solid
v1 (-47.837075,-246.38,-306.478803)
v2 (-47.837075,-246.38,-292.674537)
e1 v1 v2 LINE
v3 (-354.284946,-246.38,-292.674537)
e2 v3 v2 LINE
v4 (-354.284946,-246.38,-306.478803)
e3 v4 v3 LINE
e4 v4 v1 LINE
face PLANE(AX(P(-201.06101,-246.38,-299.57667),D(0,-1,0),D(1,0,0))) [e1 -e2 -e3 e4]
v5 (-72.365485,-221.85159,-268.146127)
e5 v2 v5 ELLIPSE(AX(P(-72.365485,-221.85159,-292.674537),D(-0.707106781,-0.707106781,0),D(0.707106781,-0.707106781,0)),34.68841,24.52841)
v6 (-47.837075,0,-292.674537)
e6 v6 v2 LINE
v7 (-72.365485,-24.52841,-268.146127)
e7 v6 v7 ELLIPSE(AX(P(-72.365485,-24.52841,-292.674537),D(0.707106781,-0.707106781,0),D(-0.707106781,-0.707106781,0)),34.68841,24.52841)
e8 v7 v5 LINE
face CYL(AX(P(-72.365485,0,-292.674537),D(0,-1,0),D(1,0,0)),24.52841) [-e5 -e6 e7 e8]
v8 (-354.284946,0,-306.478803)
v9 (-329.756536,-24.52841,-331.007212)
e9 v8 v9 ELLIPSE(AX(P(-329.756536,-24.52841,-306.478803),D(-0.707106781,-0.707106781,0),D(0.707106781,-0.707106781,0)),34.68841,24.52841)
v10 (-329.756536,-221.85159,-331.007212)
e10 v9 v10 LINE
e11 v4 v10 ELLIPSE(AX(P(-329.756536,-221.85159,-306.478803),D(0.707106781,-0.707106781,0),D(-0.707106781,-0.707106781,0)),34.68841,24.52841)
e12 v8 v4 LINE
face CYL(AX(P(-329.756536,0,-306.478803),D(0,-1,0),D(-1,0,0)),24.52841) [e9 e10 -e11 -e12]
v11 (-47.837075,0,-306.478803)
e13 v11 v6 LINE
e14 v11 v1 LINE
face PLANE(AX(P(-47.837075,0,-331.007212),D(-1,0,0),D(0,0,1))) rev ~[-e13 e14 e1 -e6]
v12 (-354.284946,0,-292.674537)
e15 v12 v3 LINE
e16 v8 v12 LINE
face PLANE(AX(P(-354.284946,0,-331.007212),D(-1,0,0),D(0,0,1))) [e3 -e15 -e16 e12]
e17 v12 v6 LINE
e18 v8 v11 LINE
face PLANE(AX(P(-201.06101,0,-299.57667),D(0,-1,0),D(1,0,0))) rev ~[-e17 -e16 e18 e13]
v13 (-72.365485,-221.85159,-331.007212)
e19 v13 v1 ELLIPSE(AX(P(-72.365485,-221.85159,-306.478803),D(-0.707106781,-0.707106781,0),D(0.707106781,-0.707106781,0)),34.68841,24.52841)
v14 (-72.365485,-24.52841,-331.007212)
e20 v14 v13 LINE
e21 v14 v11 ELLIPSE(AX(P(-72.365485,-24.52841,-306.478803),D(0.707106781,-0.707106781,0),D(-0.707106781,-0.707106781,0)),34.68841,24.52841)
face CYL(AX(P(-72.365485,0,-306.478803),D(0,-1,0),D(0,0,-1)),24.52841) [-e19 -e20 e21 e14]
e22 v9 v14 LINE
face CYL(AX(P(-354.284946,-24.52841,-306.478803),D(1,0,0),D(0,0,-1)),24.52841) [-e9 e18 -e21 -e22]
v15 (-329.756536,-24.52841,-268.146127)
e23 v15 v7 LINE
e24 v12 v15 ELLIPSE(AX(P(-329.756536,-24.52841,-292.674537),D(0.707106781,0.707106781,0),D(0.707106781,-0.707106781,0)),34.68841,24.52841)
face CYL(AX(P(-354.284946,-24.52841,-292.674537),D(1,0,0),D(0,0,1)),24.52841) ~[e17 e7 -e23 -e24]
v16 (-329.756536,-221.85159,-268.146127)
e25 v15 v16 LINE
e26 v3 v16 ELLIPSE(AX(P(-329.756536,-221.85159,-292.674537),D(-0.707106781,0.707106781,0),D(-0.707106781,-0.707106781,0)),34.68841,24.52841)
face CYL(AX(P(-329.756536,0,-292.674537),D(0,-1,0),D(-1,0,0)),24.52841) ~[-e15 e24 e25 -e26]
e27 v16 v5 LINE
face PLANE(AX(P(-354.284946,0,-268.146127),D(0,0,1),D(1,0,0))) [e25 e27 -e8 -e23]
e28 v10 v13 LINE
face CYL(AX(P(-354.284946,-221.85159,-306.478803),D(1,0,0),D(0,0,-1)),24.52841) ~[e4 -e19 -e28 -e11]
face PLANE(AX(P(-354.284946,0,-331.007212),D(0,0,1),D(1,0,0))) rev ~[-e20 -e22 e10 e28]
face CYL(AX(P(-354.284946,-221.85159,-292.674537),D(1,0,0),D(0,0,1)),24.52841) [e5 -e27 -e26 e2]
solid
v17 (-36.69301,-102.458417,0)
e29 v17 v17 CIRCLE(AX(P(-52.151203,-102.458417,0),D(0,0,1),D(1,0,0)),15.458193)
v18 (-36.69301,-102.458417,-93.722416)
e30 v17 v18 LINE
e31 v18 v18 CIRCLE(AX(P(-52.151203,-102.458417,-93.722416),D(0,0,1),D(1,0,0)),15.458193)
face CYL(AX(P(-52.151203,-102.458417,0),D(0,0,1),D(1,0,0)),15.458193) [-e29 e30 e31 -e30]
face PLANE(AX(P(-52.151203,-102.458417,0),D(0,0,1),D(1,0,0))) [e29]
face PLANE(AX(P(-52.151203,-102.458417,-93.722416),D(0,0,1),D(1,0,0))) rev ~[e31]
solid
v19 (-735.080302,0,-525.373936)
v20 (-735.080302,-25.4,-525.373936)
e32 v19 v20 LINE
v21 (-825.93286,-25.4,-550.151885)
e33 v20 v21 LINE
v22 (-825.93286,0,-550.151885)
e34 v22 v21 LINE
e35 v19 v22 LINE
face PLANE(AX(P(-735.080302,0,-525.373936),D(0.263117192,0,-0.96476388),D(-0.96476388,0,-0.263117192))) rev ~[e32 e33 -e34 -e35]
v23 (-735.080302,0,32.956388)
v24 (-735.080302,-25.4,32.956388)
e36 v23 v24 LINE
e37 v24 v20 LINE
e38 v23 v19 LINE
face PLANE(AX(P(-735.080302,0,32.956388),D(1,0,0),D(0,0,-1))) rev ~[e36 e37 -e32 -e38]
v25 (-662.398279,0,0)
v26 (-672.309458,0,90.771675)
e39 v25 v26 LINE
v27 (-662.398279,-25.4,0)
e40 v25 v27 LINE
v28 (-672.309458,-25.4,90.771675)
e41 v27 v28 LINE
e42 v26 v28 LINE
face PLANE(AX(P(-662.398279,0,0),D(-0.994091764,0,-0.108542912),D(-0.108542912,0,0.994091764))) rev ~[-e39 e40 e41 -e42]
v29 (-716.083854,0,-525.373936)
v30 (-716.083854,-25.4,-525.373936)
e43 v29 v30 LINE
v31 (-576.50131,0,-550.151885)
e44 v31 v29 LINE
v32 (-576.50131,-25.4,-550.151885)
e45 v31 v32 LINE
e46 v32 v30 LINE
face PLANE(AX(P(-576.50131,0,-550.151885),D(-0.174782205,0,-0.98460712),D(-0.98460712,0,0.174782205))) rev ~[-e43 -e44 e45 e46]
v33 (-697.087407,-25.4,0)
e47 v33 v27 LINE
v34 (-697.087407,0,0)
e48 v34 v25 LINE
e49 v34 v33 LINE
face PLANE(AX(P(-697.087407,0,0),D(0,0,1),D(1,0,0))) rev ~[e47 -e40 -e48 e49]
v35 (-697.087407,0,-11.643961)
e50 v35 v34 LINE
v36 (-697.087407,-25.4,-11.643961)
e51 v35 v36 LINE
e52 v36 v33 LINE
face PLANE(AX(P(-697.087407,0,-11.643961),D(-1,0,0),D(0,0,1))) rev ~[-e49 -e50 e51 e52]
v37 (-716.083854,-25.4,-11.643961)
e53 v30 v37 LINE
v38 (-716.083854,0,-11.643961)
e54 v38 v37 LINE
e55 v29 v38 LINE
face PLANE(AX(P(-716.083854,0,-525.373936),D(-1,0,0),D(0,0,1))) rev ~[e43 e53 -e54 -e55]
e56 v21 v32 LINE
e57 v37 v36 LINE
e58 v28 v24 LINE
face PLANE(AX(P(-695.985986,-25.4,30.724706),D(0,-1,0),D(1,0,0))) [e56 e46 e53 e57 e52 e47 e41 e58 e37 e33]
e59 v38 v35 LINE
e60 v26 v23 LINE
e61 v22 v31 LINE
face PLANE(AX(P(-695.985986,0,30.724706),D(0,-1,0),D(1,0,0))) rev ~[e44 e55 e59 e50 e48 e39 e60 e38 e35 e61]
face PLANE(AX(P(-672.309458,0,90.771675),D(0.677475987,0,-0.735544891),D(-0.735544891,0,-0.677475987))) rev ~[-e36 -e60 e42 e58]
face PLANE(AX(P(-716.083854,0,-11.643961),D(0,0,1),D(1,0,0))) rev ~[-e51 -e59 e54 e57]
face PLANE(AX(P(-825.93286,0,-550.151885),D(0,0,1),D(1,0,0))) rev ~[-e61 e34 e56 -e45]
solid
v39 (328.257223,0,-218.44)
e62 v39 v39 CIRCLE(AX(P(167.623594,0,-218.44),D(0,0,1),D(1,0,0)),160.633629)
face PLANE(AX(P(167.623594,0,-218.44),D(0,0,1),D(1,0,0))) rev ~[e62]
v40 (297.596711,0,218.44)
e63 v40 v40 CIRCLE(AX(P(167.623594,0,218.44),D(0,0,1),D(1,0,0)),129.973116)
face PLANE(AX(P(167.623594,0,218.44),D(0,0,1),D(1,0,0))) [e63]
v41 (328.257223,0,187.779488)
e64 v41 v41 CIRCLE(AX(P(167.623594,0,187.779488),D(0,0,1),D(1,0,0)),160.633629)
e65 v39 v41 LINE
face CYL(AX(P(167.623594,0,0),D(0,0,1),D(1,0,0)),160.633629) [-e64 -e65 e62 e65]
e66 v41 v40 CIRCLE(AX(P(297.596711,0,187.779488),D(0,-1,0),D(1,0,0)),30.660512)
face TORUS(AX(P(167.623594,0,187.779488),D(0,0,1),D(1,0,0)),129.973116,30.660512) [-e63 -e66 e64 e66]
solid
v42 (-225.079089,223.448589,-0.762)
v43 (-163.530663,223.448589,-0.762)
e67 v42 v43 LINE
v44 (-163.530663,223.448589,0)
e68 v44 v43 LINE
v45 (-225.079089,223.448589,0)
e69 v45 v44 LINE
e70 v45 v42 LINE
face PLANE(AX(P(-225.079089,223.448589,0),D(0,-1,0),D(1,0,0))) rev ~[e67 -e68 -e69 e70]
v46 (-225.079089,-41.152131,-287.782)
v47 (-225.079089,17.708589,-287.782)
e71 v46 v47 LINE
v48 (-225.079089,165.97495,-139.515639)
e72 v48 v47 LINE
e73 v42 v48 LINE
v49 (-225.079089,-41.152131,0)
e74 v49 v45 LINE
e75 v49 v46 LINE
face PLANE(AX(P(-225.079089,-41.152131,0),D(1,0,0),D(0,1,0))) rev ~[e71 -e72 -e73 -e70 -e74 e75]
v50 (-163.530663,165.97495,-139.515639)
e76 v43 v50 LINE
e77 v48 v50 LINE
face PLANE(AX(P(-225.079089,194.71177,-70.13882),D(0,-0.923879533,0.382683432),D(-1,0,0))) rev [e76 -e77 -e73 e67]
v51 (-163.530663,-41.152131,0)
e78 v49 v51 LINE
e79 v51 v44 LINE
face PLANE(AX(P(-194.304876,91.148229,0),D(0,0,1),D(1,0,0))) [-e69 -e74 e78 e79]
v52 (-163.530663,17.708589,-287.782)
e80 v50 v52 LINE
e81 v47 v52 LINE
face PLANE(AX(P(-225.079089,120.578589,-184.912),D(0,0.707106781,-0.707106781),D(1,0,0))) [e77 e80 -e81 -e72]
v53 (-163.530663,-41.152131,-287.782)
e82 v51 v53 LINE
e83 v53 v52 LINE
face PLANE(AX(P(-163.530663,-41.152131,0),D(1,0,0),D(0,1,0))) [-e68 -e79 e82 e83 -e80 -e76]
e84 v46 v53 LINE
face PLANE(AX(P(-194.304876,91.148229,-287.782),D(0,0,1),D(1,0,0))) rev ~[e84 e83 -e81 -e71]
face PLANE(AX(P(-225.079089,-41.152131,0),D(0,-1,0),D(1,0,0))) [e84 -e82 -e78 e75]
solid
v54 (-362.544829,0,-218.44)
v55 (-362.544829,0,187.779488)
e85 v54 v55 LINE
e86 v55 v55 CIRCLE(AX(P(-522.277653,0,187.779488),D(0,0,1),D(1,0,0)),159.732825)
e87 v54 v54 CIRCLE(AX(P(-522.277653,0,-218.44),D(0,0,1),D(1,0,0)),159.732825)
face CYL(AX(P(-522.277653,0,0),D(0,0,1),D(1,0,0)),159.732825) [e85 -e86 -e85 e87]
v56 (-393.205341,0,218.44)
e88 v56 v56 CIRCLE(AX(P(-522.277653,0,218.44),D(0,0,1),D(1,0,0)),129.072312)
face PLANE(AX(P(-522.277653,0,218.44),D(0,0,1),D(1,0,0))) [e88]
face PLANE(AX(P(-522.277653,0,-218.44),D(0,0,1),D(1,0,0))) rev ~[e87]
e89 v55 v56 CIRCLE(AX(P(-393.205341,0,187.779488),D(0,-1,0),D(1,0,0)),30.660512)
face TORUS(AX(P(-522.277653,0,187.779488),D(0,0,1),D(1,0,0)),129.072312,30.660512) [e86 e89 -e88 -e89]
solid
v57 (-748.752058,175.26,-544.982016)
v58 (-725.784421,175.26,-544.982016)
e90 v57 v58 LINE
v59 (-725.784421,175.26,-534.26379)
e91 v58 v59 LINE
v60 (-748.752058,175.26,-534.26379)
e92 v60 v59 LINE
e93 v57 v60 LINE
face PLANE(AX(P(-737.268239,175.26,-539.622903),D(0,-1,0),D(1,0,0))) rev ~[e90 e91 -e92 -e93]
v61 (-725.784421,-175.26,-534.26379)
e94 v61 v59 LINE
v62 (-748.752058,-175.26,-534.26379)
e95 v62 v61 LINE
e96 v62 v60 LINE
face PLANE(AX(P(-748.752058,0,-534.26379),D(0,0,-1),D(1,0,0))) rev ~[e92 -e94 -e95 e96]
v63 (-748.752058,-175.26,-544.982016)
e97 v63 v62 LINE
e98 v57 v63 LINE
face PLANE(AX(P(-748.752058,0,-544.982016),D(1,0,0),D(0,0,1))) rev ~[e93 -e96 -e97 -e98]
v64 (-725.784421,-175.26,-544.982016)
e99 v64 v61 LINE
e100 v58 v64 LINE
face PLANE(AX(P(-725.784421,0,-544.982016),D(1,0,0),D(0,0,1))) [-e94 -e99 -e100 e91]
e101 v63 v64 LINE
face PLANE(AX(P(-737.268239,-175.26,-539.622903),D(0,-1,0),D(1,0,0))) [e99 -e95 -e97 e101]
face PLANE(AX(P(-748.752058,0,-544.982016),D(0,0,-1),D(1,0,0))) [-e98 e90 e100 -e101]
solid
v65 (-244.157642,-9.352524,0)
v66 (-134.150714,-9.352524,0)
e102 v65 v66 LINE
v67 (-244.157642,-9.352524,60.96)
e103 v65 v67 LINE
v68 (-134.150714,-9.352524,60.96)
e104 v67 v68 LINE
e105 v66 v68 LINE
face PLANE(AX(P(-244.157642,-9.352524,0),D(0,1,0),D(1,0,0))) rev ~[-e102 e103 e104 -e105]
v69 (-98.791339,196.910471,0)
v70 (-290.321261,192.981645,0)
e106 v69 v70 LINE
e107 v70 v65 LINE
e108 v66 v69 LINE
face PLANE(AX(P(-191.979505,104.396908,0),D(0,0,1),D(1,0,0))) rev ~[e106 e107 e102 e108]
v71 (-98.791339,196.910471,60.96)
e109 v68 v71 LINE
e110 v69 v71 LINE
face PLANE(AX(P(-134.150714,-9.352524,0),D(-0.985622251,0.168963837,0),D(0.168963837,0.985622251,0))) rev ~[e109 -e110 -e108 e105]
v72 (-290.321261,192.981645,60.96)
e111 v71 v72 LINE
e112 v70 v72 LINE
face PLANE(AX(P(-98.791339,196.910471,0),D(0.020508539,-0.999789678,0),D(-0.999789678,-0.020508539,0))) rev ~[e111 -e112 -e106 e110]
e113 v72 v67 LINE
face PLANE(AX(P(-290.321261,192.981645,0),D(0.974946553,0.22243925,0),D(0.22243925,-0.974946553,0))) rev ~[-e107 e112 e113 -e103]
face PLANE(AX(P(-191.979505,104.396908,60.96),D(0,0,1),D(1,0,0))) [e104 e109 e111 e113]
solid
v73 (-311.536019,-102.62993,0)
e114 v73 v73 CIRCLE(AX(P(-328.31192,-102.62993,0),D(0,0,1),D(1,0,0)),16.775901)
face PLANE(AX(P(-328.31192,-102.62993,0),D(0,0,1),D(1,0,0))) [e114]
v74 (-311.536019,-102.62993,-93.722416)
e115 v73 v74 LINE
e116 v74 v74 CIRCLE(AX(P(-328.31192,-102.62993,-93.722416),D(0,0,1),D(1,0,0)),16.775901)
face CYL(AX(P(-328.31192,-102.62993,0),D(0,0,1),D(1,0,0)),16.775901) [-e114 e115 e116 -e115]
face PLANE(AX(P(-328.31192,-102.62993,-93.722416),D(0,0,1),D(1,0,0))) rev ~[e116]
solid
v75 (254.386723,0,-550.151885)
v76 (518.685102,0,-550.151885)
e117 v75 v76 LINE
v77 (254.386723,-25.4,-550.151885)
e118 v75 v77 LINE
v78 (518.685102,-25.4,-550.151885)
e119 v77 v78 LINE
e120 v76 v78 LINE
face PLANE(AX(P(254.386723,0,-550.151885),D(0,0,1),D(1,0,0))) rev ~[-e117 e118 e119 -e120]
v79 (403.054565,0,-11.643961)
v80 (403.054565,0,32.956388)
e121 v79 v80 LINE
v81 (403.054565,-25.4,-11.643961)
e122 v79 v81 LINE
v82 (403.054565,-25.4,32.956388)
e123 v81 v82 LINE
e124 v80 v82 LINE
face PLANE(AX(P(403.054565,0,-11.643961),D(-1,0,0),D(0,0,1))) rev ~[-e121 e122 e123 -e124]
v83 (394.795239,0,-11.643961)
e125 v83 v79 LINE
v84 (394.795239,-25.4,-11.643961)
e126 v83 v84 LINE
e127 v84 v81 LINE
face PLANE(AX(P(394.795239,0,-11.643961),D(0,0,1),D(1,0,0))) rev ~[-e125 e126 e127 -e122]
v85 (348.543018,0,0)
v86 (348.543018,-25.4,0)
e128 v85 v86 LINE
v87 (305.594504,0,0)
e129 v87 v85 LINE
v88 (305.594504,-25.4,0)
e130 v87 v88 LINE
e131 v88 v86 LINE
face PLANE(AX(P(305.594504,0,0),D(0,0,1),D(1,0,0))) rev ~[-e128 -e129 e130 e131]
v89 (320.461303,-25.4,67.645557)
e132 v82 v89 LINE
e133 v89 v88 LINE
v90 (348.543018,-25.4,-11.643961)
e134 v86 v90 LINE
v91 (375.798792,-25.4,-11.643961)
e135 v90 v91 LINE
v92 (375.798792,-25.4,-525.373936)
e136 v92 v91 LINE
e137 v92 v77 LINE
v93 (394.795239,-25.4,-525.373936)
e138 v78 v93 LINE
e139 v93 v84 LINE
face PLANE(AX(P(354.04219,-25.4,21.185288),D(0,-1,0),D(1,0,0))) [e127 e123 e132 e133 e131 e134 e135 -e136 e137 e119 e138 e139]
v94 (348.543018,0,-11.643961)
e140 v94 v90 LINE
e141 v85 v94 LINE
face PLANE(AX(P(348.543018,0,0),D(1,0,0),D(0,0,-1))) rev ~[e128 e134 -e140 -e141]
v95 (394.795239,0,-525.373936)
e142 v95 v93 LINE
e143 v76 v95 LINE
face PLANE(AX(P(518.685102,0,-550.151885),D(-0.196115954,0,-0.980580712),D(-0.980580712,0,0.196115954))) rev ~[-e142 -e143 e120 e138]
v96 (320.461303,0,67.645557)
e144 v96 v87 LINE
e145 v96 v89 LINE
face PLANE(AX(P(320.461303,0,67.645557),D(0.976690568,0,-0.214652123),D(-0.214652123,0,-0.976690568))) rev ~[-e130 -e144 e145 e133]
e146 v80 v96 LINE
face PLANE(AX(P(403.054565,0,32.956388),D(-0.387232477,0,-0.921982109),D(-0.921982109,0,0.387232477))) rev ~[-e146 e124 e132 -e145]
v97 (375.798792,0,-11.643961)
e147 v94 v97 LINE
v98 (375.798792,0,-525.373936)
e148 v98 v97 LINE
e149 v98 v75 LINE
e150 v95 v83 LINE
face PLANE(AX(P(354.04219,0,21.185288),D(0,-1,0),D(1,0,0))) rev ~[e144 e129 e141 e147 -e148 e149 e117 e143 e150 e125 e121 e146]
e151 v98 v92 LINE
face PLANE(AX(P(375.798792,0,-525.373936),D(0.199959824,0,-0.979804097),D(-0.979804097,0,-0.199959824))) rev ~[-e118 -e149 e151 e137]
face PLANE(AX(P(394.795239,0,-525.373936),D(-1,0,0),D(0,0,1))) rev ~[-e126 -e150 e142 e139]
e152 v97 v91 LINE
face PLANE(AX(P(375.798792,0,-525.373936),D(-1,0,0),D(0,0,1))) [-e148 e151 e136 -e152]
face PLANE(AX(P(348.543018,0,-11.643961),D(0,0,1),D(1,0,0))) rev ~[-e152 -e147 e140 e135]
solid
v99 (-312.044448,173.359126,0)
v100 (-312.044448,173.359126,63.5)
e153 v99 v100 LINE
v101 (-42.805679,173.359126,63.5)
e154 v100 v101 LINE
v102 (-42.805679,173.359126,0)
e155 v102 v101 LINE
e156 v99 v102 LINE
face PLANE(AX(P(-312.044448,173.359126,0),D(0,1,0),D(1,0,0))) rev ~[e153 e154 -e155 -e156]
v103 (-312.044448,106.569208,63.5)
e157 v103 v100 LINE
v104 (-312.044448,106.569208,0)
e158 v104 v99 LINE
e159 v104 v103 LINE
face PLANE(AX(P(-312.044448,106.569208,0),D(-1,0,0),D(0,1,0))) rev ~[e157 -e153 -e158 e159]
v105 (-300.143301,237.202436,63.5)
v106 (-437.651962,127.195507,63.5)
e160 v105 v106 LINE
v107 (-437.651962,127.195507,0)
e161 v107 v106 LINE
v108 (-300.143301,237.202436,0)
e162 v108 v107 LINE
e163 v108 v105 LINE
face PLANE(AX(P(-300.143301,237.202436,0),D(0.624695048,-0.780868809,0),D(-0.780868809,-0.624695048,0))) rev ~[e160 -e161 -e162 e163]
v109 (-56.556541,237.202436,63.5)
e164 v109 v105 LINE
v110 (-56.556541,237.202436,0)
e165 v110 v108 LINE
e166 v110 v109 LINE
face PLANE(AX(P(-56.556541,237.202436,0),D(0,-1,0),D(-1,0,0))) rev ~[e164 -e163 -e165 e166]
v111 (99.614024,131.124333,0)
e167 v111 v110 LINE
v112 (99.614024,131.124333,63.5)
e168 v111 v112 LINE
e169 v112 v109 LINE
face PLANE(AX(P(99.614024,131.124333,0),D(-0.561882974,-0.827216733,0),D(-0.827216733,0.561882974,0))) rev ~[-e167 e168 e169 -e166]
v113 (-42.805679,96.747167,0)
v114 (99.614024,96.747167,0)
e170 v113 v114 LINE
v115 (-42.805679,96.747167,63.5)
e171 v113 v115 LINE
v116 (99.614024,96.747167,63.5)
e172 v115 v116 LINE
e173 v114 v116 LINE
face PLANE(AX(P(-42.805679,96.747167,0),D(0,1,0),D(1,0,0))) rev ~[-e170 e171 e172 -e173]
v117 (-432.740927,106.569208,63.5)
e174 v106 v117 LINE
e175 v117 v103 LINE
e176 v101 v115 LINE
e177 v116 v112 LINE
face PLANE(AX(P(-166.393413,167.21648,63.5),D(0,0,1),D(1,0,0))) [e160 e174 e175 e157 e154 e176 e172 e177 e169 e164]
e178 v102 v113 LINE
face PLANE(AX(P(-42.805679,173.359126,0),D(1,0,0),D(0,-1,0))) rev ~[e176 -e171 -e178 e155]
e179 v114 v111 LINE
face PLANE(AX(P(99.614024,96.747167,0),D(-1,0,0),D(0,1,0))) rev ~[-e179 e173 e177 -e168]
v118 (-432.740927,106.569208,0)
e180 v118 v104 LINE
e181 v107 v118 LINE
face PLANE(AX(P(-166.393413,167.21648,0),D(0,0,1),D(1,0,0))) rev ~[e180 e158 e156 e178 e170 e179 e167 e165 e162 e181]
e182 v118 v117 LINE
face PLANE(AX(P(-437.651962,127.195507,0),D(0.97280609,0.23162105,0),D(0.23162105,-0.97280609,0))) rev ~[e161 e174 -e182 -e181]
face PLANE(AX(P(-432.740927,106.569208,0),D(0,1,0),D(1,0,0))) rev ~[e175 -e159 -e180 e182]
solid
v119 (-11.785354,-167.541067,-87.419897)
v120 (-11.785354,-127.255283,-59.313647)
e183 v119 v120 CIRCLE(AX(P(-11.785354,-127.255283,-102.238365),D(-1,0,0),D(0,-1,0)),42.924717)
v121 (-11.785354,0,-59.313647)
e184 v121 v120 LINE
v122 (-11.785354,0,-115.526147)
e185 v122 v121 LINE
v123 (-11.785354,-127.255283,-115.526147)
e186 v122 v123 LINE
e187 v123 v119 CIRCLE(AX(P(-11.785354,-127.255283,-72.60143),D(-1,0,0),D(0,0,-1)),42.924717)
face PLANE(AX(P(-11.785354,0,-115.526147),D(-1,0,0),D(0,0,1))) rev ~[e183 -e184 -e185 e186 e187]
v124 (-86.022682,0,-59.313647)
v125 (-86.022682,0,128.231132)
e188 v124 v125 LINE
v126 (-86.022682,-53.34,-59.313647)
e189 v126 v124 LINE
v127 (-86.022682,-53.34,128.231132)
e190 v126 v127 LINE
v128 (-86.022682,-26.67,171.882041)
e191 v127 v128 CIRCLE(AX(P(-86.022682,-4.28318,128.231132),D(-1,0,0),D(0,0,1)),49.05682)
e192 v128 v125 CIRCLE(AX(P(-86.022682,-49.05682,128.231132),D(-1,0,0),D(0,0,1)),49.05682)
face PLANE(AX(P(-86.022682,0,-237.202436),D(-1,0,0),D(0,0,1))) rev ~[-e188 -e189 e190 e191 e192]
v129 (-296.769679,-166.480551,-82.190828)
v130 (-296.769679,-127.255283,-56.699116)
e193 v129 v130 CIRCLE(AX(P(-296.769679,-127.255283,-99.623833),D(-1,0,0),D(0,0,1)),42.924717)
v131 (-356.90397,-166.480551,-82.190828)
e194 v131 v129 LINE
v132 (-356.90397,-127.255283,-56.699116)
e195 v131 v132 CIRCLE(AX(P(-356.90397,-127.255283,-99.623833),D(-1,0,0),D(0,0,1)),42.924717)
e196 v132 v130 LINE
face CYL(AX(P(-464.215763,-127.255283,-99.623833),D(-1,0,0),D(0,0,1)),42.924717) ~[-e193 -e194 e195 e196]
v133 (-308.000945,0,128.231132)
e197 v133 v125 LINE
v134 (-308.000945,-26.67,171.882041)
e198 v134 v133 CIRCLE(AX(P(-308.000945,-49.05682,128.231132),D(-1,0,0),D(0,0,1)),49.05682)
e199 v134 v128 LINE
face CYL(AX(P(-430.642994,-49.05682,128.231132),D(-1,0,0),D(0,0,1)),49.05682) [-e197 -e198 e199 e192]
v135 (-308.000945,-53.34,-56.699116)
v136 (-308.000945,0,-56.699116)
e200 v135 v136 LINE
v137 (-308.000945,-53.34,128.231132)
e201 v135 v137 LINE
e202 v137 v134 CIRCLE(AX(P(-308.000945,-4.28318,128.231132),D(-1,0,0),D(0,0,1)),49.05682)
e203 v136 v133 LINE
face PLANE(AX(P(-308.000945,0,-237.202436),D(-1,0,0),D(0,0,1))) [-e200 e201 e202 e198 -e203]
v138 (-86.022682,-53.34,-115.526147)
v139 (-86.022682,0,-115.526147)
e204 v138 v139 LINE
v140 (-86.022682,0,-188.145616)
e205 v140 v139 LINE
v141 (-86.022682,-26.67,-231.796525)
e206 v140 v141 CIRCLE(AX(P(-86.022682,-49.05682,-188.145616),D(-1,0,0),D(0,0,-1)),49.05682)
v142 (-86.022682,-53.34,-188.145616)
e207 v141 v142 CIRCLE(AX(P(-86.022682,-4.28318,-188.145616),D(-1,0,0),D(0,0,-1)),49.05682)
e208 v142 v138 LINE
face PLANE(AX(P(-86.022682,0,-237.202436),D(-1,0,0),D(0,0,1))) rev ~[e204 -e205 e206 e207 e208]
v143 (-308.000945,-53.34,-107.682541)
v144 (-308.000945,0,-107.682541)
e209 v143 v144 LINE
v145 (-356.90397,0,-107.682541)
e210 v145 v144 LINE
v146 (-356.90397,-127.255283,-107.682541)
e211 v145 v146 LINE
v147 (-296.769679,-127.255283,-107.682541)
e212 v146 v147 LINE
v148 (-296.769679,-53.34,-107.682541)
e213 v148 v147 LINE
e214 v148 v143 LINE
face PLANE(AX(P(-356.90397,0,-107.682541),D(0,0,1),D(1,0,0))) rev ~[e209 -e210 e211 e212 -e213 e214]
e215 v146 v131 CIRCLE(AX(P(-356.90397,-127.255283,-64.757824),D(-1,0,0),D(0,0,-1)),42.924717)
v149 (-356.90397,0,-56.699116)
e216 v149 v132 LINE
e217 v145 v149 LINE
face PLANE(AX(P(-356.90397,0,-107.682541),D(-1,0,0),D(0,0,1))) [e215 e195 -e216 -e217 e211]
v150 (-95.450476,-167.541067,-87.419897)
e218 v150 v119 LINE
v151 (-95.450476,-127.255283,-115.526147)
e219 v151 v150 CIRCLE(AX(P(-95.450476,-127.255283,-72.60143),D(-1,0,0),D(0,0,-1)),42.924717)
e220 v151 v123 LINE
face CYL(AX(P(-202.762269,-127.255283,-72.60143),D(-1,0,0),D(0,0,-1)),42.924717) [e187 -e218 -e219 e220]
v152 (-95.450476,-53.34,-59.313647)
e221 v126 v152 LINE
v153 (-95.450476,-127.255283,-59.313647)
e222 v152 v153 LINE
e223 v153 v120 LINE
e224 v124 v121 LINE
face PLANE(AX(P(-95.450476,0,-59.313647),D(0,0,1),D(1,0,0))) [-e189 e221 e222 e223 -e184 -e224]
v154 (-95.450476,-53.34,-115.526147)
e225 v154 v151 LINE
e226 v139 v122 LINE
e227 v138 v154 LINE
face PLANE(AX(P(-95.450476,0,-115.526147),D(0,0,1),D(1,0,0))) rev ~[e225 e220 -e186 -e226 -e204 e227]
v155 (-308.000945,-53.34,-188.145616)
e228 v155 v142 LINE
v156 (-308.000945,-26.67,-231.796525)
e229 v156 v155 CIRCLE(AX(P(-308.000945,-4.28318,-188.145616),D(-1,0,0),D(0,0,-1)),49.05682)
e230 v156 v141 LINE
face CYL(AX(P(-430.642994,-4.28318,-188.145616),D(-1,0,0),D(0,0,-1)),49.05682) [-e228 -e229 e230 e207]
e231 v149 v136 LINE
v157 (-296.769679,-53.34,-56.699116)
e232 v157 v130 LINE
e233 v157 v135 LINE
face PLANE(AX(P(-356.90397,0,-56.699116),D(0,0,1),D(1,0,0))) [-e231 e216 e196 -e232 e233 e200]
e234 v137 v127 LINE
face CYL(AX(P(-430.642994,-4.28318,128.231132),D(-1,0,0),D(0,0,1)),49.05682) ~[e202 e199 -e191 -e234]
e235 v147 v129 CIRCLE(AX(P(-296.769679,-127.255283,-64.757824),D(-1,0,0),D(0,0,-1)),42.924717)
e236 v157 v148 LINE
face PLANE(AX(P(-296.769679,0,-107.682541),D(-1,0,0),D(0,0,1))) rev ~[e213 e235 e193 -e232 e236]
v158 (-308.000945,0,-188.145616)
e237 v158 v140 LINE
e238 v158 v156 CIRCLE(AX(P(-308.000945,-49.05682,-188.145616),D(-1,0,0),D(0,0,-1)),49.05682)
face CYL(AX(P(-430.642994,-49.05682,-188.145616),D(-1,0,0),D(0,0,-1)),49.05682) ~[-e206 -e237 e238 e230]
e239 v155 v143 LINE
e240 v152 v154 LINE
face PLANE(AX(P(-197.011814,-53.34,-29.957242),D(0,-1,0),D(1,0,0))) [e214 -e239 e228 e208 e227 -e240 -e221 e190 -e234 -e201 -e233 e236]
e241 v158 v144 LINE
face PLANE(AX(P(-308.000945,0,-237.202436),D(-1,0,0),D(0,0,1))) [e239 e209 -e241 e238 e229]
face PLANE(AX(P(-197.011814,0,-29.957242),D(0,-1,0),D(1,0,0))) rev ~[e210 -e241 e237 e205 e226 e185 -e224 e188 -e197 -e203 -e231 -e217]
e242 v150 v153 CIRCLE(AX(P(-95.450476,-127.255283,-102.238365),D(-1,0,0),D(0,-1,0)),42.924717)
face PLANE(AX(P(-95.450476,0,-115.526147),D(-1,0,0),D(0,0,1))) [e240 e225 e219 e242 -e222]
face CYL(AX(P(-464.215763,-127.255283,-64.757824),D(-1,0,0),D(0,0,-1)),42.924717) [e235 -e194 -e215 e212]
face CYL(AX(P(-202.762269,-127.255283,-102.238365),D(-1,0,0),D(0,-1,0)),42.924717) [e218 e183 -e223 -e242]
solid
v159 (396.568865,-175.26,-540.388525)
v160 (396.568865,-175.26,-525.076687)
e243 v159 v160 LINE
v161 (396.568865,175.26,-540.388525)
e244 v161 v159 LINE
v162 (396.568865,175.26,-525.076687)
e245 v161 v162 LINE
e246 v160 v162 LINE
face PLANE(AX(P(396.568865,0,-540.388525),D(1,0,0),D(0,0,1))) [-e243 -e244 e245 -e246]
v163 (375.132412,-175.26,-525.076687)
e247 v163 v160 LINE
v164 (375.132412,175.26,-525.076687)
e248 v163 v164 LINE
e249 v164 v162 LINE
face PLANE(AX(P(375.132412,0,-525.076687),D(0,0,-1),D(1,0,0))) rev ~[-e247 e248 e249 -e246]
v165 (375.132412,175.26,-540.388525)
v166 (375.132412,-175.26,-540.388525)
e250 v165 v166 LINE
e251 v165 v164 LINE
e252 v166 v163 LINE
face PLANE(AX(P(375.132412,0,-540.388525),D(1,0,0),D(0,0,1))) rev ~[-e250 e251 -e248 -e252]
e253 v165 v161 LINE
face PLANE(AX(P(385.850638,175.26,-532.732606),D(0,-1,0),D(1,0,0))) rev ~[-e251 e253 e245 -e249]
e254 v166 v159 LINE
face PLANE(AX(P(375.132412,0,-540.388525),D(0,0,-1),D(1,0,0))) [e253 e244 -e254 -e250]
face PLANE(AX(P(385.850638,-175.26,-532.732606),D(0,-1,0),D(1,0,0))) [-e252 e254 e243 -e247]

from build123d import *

# Parameters (mm, degrees)
F0_R         = 160.6336286285
F1_DEPTH     = 218.44
F0_R_2       = 159.7328245583
F3_DEPTH     = 63.5
F4_W         = 221.9782620668
F4_H         = 414.4903868437
F5_DEPTH     = 53.34
F6_T1_DEPTH  = 467.2623600039
F8_DEPTH     = 60.96
F4_W_2       = 306.4478710294
F4_H_2       = 62.861084938
F9_DEPTH     = 246.38
F10_R        = 24.5284097937
F11_W        = 61.5484267473
F11_H        = 264.6007202566
F12_DEPTH    = 287.782
F13_SIZE     = 205.74
F14_SIZE     = 81.28
F19_W        = 18.9964473248
F19_H        = 513.7299746275
F20_DEPTH    = 25.4
F21_W        = 22.9676365852
F21_H        = 10.7182264328
F22_DEPTH    = 175.26
F21_W_2      = 21.4364528656
F21_H_2      = 15.3118371964
F23_W        = 83.6651213467
F23_H        = 56.2124997377
F23_W_2      = 60.1342916489
F23_H_2      = 50.9834252298
F24_DEPTH    = 170.18
F25_T1_DEPTH = 274.7578773438
F25_T3_DEPTH = 298.2887070417
F26_R        = 30.6605122421
F26_2_R      = 30.6605122421
F27_R        = 16.7759014108
F28_DEPTH    = 93.722416088
F27_R_2      = 15.45819276


# Not quite as in the source:
# - a fillet or chamfer that OpenCascade refuses, or shapes differently, is made with other operations: its cross-section is extruded or revolved along the edge and cut away or added
# - the program builds the solid bodies; features that only make, move or delete a surface that nothing else refers to are left out


with BuildPart() as f1:
    # F0 (on Top) → F1 (new body, symmetric)
    with BuildSketch(Plane.XY):
        with Locations((167.6235944033, 0)):
            Circle(F0_R)
    extrude(amount=F1_DEPTH, both=True)

    # F26
    f26_edges = [f1.edges().sort_by_distance(p)[0] for p in [
        (6.989966, 0, 218.44),
    ]]
    fillet(f26_edges, radius=F26_R)


with BuildPart() as f1b:
    # F0 (on Top) → F1, piece 2 (new body, symmetric)
    with BuildSketch(Plane.XY):
        with Locations((-522.2776532173, 0)):
            Circle(F0_R_2)
    extrude(amount=F1_DEPTH, both=True)

    # F26#2
    f26_2_edges = [f1b.edges().sort_by_distance(p)[0] for p in [
        (-682.010478, 0, 218.44),
    ]]
    fillet(f26_2_edges, radius=F26_2_R)


with BuildPart() as f3:
    # F2 (on Top) → F3 (new body)
    with BuildSketch(Plane.XY):
        Polygon((-300.143301487, 237.2024357319), (-437.6519620419, 127.195507288), (-432.7409267426, 106.5692082047), (-312.0444483441, 106.5692082047), (-312.0444483441, 173.3591258526), (-42.8056791425, 173.3591258526), (-42.8056791425, 96.7471674085), (99.6140241623, 96.7471674085), (99.6140241623, 131.1243325472), (-56.5565414727, 237.2024357319), align=None)
    extrude(amount=F3_DEPTH)


with BuildPart() as f5:
    # F4 (on Front) → F5 (new body)
    with BuildSketch(Plane.XZ):
        with Locations((-197.0118135214, -29.95724231)):
            Rectangle(F4_W, F4_H)
    extrude(amount=F5_DEPTH)

    # F6: fillet of radius 49.0568195874 on 4 edges, made by hand

    # F6_s2 → F6_t1 (cut)
    with BuildSketch(Plane.YZ.offset(-430.6429935234)):
        with BuildLine():
            ThreePointArc((-49.0568195874, -237.2024357319), (-14.3684097937, -222.8340259382), (0, -188.1456161445))
            Line((0, -188.1456161445), (0, -237.2024357319))
            Line((0, -237.2024357319), (-49.0568195874, -237.2024357319))
        make_face()
        with BuildLine():
            ThreePointArc((-4.2831804126, -237.2024357319), (-38.9715902063, -222.8340259382), (-53.34, -188.1456161445))
            Line((-53.34, -188.1456161445), (-53.34, -237.2024357319))
            Line((-53.34, -237.2024357319), (-4.2831804126, -237.2024357319))
        make_face()
        with BuildLine():
            ThreePointArc((-4.2831804126, 177.2879511118), (-38.9715902063, 162.9195413181), (-53.34, 128.2311315244))
            Line((-53.34, 128.2311315244), (-53.34, 177.2879511118))
            Line((-53.34, 177.2879511118), (-4.2831804126, 177.2879511118))
        make_face()
        with BuildLine():
            ThreePointArc((-49.0568195874, 177.2879511118), (-14.3684097937, 162.9195413181), (0, 128.2311315244))
            Line((0, 128.2311315244), (0, 177.2879511118))
            Line((0, 177.2879511118), (-49.0568195874, 177.2879511118))
        make_face()
    extrude(amount=F6_T1_DEPTH, mode=Mode.SUBTRACT)

    # F23 (on Front) → F24 (join)
    with BuildSketch(Plane.XZ):
        with Locations((-53.6179151386, -87.4198973179)):
            Rectangle(F23_W, F23_H)
        with Locations((-326.8368244171, -82.1908283979)):
            Rectangle(F23_W_2, F23_H_2)
    extrude(amount=F24_DEPTH)

    # F25: fillet of radius 42.924717139 on 4 edges, made by hand

    # F25_s2 → F25_t1 (cut)
    with BuildSketch(Plane.YZ.offset(-464.215763089)):
        with BuildLine():
            ThreePointArc((-127.255282861, -56.699115783), (-157.6076414305, -69.2714743525), (-170.18, -99.623832922))
            Line((-170.18, -99.623832922), (-170.18, -56.699115783))
            Line((-170.18, -56.699115783), (-127.255282861, -56.699115783))
        make_face()
        with BuildLine():
            ThreePointArc((-127.255282861, -107.6825410128), (-157.6076414305, -95.1101824433), (-170.18, -64.7578238738))
            Line((-170.18, -64.7578238738), (-170.18, -107.6825410128))
            Line((-170.18, -107.6825410128), (-127.255282861, -107.6825410128))
        make_face()
    extrude(amount=F25_T1_DEPTH, mode=Mode.SUBTRACT)

    # F25_s4 → F25_t3 (cut)
    with BuildSketch(Plane.YZ.offset(-202.7622686594)):
        with BuildLine():
            ThreePointArc((-170.18, -102.238364588), (-157.6076414305, -71.8860060185), (-127.255282861, -59.313647449))
            Line((-127.255282861, -59.313647449), (-170.18, -59.313647449))
            Line((-170.18, -59.313647449), (-170.18, -102.238364588))
        make_face()
        with BuildLine():
            ThreePointArc((-127.255282861, -115.5261471868), (-157.6076414305, -102.9537886173), (-170.18, -72.6014300478))
            Line((-170.18, -72.6014300478), (-170.18, -115.5261471868))
            Line((-170.18, -115.5261471868), (-127.255282861, -115.5261471868))
        make_face()
    extrude(amount=F25_T3_DEPTH, mode=Mode.SUBTRACT)


with BuildPart() as f8:
    # F7 (on Top) → F8 (new body)
    with BuildSketch(Plane.XY):
        Polygon((-98.7913385034, 196.9104707241), (-290.3212606907, 192.9816454649), (-244.1576421261, -9.3525238335), (-134.1507136822, -9.3525238335), align=None)
    extrude(amount=F8_DEPTH)


with BuildPart() as f9:
    # F4 (on Front) → F9 (new body)
    with BuildSketch(Plane.XZ):
        with Locations((-201.0610103607, -299.5766699314)):
            Rectangle(F4_W_2, F4_H_2)
    extrude(amount=F9_DEPTH)

    # F10
    f10_edges = [f9.edges().sort_by_distance(p)[0] for p in [
        (-354.284946, -123.19, -268.146127),
        (-354.284946, -123.19, -331.007212),
        (-47.837075, -123.19, -268.146127),
        (-47.837075, -123.19, -331.007212),
        (-201.06101, -246.38, -268.146127),
        (-201.06101, -246.38, -331.007212),
        (-201.06101, 0, -268.146127),
        (-201.06101, 0, -331.007212),
    ]]
    fillet(f10_edges, radius=F10_R)


with BuildPart() as f12:
    # F11 (on Top) → F12 (new body)
    with BuildSketch(Plane.XY):
        with Locations((-194.3048760295, 91.1482293159)):
            Rectangle(F11_W, F11_H)
    extrude(amount=-F12_DEPTH)

    # F13
    f13_edges = [f12.edges().sort_by_distance(p)[0] for p in [
        (-194.304876, 223.448589, -287.782),
    ]]
    chamfer(f13_edges, length=F13_SIZE)

    # F14
    f14_edges = [f12.edges().sort_by_distance(p)[0] for p in [
        (-194.304876, 223.448589, -82.042),
    ]]
    chamfer(f14_edges, length=F14_SIZE)


with BuildPart() as f20:
    # F19 (on Front) → F20 (new body)
    with BuildSketch(Plane.XZ):
        Polygon((-662.3982787132, 0), (-672.3094582558, 90.7716751099), (-735.0803017616, 32.9563878477), (-735.0803017616, -11.643961072), (-716.0838544369, -11.643961072), (-697.0874071121, -11.643961072), (-697.0874071121, 0), align=None)
        with Locations((-725.5820780993, -268.5089483857)):
            Rectangle(F19_W, F19_H)
        Polygon((-716.0838544369, -525.3739356995), (-735.0803017616, -525.3739356995), (-825.9328603745, -550.1518845558), (-576.5013098717, -550.1518845558), align=None)
    extrude(amount=F20_DEPTH)


with BuildPart() as f20b:
    # F19 (on Front) → F20, piece 2 (new body)
    with BuildSketch(Plane.XZ):
        Polygon((403.0545651913, 32.9563878477), (320.4613029957, 67.6455572248), (305.5945038795, 0), (348.5430181026, 0), (348.5430181026, -11.643961072), (375.798791647, -11.643961072), (394.7952389717, -11.643961072), (403.0545651913, -11.643961072), align=None)
        with Locations((385.2970153093, -268.5089483857)):
            Rectangle(F19_W, F19_H)
        Polygon((518.6851024628, -550.1518845558), (394.7952389717, -525.3739356995), (375.798791647, -525.3739356995), (254.3867230415, -550.1518845558), align=None)
    extrude(amount=F20_DEPTH)


with BuildPart() as f22:
    # F21 (on Front) → F22 (new body, symmetric)
    with BuildSketch(Plane.XZ):
        with Locations((-737.2682392597, -539.6229028702)):
            Rectangle(F21_W, F21_H)
    extrude(amount=F22_DEPTH, both=True)


with BuildPart() as f22b:
    # F21 (on Front) → F22, piece 2 (new body, symmetric)
    with BuildSketch(Plane.XZ):
        with Locations((385.8506381512, -532.7326059341)):
            Rectangle(F21_W_2, F21_H_2)
    extrude(amount=F22_DEPTH, both=True)


with BuildPart() as f28:
    # F27 (on Top) → F28 (new body)
    with BuildSketch(Plane.XY):
        with Locations((-328.311920166, -102.629929781)):
            Circle(F27_R)
    extrude(amount=-F28_DEPTH)


with BuildPart() as f28b:
    # F27 (on Top) → F28, piece 2 (new body)
    with BuildSketch(Plane.XY):
        with Locations((-52.1512031555, -102.4584174156)):
            Circle(F27_R_2)
    extrude(amount=-F28_DEPTH)


solid = Compound([f1.part, f1b.part, f3.part, f5.part, f8.part, f9.part, f12.part, f20.part, f20b.part, f22.part, f22b.part, f28.part, f28b.part])
